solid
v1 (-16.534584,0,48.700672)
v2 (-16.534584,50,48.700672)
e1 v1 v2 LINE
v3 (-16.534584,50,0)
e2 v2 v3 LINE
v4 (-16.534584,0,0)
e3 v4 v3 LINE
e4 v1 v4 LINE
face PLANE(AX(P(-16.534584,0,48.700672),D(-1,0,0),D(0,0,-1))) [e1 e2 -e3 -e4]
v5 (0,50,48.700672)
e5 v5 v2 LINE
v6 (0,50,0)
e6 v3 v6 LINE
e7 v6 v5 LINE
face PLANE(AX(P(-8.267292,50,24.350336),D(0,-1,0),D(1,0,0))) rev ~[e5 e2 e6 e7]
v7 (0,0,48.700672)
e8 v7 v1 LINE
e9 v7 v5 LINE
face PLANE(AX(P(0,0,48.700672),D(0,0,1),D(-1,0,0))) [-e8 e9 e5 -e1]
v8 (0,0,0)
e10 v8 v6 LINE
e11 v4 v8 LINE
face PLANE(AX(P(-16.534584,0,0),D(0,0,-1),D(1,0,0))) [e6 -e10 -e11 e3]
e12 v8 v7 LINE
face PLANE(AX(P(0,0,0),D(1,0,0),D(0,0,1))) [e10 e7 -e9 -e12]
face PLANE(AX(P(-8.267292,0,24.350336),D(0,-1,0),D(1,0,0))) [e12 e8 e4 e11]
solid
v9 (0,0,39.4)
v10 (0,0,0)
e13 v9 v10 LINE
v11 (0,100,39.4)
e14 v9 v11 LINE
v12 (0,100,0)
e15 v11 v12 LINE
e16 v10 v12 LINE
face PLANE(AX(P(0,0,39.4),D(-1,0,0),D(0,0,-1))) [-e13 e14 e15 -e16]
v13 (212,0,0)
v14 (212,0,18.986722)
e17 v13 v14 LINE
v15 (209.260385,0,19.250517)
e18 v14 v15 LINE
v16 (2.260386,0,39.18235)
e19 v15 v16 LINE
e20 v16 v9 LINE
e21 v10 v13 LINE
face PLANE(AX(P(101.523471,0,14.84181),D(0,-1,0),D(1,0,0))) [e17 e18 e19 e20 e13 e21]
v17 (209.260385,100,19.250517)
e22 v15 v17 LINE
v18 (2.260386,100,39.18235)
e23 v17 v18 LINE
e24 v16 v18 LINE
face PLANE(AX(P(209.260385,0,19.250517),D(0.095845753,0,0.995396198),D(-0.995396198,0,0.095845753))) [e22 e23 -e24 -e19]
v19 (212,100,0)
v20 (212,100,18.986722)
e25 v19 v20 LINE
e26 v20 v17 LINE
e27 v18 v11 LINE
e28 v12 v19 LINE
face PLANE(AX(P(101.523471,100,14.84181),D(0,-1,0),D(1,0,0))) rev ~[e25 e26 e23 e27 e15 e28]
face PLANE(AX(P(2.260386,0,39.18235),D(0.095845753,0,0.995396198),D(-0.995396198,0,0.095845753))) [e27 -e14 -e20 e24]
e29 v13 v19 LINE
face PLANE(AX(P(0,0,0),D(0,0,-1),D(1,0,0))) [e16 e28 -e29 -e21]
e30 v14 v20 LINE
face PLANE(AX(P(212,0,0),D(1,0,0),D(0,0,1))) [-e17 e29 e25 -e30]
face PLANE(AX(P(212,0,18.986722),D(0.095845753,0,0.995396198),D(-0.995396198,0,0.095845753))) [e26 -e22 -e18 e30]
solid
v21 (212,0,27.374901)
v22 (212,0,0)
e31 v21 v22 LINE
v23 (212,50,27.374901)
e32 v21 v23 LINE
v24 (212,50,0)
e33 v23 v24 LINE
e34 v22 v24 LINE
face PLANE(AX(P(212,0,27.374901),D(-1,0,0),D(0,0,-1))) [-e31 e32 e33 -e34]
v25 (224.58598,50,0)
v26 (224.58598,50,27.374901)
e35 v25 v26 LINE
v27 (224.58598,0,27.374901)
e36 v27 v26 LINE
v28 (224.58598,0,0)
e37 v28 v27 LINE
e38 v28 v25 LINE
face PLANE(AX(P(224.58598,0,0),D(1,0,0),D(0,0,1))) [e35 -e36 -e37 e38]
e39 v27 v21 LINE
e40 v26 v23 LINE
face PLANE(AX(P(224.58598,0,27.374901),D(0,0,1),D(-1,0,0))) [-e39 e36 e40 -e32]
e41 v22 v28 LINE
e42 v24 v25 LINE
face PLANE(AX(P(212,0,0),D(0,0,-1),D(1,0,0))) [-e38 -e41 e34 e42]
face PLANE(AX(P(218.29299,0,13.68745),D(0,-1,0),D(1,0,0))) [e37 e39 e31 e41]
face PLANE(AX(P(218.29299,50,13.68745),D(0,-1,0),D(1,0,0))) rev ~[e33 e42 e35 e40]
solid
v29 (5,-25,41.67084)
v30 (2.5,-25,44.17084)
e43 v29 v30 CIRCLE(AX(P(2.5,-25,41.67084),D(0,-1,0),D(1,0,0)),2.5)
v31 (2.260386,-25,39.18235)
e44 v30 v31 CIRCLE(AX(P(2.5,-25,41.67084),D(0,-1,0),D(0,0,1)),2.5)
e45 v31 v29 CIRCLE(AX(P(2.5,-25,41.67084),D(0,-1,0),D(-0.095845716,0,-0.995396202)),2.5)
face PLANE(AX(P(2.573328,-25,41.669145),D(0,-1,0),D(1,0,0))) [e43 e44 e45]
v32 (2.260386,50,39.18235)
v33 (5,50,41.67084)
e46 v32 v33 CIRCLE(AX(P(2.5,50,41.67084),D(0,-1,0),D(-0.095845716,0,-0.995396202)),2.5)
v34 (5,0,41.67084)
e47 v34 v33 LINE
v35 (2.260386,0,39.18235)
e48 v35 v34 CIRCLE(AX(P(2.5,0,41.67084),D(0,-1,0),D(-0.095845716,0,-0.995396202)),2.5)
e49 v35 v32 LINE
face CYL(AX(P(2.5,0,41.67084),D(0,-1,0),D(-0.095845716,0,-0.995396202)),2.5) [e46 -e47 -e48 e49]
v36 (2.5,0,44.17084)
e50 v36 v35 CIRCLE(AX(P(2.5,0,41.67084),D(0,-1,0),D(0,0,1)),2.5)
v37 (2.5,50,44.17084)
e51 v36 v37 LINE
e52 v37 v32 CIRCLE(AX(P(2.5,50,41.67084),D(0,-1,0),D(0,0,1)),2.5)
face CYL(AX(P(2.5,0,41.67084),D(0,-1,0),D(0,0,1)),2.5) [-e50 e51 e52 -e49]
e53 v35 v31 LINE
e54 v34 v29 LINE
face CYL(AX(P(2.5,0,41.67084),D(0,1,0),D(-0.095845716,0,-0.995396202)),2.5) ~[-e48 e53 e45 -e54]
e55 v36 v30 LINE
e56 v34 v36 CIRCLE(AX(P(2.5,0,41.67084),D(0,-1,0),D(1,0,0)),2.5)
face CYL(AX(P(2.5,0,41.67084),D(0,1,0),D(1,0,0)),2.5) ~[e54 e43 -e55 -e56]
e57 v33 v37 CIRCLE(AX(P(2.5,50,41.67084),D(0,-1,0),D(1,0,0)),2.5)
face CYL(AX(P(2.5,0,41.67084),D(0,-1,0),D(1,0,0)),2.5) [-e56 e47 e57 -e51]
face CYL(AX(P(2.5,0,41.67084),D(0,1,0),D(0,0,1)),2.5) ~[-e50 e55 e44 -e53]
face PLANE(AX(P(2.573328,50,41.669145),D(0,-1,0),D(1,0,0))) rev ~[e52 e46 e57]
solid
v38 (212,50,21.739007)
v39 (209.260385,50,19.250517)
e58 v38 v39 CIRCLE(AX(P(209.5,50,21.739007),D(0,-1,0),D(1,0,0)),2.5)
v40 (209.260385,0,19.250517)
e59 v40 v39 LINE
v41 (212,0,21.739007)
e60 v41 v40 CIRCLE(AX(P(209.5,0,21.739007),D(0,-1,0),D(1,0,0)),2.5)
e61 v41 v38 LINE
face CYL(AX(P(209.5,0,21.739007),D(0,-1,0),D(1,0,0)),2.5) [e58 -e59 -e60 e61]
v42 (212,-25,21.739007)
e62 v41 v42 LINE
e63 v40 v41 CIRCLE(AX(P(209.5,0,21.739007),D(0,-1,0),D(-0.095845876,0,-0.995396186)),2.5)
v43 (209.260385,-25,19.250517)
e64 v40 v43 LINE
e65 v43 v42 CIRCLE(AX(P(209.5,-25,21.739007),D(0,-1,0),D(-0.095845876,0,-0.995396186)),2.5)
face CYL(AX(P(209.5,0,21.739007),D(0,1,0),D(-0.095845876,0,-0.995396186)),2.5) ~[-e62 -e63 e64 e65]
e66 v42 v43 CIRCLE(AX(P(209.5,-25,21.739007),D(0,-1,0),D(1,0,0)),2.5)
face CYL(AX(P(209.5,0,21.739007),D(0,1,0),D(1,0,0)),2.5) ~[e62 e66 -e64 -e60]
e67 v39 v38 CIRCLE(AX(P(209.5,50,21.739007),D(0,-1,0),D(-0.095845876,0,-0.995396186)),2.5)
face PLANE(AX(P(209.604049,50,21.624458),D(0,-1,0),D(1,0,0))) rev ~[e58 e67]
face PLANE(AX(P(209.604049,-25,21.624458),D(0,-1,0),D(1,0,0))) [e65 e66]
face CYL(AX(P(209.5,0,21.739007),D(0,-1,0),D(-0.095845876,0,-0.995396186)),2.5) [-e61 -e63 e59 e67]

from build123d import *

# Parameters (mm, degrees)
F1_DEPTH      = 100
F2_DEPTH      = 25
F2_DEPTH_BACK = 50
F4_DEPTH      = 50


with BuildPart() as f1:
    # F0 (on Front) → F1 (new body)
    with BuildSketch(Plane.XZ):
        Polygon((0, 39.4), (0, 0), (212, 0), (212, 18.9867217821), (209.2603853098, 19.2505166731), (2.2603857104, 39.1823496114), align=None)
    extrude(amount=-F1_DEPTH)


with BuildPart() as f2:
    # F0 (on Front) → F2 (new body, two sides)
    with BuildSketch(Plane.XZ) as f2_sk:
        with BuildLine():
            ThreePointArc((2.5, 44.1708401161), (0.0028790316, 41.7907853914), (2.2603857104, 39.1823496114))
            ThreePointArc((2.2603857104, 39.1823496114), (4.1809170527, 39.8202948284), (5, 41.6708401161))
            ThreePointArc((5, 41.6708401161), (4.267766953, 43.4386070691), (2.5, 44.1708401161))
        make_face()
    extrude(amount=F2_DEPTH)
    extrude(f2_sk.sketch, amount=-F2_DEPTH_BACK)


with BuildPart() as f2b:
    # F0 (on Front) → F2, piece 2 (new body, two sides)
    with BuildSketch(Plane.XZ) as f2_2_sk:
        with BuildLine():
            ThreePointArc((212, 21.7390071392), (207.8190830963, 23.5895525623), (209.2603853098, 19.2505166731))
            ThreePointArc((209.2603853098, 19.2505166731), (211.1809169037, 19.8884617162), (212, 21.7390071392))
        make_face()
    extrude(amount=F2_DEPTH)
    extrude(f2_2_sk.sketch, amount=-F2_DEPTH_BACK)


with BuildPart() as f4:
    # F3 (on face) → F4 (new body)
    with BuildSketch(Plane.XZ):
        Polygon((212, 18.9867217821), (212, 0), (224.5859801769, 0), (224.5859801769, 27.3749008775), (212, 27.3749008775), align=None)
    extrude(amount=-F4_DEPTH)


with BuildPart() as f4b:
    # F3 (on face) → F4, piece 2 (new body)
    with BuildSketch(Plane.XZ):
        Polygon((-16.5345836431, 0), (0, 0), (0, 39.4), (0, 48.700671643), (-16.5345836431, 48.700671643), align=None)
    extrude(amount=-F4_DEPTH)


solid = Compound([f1.part, f2.part, f2b.part, f4.part, f4b.part])
